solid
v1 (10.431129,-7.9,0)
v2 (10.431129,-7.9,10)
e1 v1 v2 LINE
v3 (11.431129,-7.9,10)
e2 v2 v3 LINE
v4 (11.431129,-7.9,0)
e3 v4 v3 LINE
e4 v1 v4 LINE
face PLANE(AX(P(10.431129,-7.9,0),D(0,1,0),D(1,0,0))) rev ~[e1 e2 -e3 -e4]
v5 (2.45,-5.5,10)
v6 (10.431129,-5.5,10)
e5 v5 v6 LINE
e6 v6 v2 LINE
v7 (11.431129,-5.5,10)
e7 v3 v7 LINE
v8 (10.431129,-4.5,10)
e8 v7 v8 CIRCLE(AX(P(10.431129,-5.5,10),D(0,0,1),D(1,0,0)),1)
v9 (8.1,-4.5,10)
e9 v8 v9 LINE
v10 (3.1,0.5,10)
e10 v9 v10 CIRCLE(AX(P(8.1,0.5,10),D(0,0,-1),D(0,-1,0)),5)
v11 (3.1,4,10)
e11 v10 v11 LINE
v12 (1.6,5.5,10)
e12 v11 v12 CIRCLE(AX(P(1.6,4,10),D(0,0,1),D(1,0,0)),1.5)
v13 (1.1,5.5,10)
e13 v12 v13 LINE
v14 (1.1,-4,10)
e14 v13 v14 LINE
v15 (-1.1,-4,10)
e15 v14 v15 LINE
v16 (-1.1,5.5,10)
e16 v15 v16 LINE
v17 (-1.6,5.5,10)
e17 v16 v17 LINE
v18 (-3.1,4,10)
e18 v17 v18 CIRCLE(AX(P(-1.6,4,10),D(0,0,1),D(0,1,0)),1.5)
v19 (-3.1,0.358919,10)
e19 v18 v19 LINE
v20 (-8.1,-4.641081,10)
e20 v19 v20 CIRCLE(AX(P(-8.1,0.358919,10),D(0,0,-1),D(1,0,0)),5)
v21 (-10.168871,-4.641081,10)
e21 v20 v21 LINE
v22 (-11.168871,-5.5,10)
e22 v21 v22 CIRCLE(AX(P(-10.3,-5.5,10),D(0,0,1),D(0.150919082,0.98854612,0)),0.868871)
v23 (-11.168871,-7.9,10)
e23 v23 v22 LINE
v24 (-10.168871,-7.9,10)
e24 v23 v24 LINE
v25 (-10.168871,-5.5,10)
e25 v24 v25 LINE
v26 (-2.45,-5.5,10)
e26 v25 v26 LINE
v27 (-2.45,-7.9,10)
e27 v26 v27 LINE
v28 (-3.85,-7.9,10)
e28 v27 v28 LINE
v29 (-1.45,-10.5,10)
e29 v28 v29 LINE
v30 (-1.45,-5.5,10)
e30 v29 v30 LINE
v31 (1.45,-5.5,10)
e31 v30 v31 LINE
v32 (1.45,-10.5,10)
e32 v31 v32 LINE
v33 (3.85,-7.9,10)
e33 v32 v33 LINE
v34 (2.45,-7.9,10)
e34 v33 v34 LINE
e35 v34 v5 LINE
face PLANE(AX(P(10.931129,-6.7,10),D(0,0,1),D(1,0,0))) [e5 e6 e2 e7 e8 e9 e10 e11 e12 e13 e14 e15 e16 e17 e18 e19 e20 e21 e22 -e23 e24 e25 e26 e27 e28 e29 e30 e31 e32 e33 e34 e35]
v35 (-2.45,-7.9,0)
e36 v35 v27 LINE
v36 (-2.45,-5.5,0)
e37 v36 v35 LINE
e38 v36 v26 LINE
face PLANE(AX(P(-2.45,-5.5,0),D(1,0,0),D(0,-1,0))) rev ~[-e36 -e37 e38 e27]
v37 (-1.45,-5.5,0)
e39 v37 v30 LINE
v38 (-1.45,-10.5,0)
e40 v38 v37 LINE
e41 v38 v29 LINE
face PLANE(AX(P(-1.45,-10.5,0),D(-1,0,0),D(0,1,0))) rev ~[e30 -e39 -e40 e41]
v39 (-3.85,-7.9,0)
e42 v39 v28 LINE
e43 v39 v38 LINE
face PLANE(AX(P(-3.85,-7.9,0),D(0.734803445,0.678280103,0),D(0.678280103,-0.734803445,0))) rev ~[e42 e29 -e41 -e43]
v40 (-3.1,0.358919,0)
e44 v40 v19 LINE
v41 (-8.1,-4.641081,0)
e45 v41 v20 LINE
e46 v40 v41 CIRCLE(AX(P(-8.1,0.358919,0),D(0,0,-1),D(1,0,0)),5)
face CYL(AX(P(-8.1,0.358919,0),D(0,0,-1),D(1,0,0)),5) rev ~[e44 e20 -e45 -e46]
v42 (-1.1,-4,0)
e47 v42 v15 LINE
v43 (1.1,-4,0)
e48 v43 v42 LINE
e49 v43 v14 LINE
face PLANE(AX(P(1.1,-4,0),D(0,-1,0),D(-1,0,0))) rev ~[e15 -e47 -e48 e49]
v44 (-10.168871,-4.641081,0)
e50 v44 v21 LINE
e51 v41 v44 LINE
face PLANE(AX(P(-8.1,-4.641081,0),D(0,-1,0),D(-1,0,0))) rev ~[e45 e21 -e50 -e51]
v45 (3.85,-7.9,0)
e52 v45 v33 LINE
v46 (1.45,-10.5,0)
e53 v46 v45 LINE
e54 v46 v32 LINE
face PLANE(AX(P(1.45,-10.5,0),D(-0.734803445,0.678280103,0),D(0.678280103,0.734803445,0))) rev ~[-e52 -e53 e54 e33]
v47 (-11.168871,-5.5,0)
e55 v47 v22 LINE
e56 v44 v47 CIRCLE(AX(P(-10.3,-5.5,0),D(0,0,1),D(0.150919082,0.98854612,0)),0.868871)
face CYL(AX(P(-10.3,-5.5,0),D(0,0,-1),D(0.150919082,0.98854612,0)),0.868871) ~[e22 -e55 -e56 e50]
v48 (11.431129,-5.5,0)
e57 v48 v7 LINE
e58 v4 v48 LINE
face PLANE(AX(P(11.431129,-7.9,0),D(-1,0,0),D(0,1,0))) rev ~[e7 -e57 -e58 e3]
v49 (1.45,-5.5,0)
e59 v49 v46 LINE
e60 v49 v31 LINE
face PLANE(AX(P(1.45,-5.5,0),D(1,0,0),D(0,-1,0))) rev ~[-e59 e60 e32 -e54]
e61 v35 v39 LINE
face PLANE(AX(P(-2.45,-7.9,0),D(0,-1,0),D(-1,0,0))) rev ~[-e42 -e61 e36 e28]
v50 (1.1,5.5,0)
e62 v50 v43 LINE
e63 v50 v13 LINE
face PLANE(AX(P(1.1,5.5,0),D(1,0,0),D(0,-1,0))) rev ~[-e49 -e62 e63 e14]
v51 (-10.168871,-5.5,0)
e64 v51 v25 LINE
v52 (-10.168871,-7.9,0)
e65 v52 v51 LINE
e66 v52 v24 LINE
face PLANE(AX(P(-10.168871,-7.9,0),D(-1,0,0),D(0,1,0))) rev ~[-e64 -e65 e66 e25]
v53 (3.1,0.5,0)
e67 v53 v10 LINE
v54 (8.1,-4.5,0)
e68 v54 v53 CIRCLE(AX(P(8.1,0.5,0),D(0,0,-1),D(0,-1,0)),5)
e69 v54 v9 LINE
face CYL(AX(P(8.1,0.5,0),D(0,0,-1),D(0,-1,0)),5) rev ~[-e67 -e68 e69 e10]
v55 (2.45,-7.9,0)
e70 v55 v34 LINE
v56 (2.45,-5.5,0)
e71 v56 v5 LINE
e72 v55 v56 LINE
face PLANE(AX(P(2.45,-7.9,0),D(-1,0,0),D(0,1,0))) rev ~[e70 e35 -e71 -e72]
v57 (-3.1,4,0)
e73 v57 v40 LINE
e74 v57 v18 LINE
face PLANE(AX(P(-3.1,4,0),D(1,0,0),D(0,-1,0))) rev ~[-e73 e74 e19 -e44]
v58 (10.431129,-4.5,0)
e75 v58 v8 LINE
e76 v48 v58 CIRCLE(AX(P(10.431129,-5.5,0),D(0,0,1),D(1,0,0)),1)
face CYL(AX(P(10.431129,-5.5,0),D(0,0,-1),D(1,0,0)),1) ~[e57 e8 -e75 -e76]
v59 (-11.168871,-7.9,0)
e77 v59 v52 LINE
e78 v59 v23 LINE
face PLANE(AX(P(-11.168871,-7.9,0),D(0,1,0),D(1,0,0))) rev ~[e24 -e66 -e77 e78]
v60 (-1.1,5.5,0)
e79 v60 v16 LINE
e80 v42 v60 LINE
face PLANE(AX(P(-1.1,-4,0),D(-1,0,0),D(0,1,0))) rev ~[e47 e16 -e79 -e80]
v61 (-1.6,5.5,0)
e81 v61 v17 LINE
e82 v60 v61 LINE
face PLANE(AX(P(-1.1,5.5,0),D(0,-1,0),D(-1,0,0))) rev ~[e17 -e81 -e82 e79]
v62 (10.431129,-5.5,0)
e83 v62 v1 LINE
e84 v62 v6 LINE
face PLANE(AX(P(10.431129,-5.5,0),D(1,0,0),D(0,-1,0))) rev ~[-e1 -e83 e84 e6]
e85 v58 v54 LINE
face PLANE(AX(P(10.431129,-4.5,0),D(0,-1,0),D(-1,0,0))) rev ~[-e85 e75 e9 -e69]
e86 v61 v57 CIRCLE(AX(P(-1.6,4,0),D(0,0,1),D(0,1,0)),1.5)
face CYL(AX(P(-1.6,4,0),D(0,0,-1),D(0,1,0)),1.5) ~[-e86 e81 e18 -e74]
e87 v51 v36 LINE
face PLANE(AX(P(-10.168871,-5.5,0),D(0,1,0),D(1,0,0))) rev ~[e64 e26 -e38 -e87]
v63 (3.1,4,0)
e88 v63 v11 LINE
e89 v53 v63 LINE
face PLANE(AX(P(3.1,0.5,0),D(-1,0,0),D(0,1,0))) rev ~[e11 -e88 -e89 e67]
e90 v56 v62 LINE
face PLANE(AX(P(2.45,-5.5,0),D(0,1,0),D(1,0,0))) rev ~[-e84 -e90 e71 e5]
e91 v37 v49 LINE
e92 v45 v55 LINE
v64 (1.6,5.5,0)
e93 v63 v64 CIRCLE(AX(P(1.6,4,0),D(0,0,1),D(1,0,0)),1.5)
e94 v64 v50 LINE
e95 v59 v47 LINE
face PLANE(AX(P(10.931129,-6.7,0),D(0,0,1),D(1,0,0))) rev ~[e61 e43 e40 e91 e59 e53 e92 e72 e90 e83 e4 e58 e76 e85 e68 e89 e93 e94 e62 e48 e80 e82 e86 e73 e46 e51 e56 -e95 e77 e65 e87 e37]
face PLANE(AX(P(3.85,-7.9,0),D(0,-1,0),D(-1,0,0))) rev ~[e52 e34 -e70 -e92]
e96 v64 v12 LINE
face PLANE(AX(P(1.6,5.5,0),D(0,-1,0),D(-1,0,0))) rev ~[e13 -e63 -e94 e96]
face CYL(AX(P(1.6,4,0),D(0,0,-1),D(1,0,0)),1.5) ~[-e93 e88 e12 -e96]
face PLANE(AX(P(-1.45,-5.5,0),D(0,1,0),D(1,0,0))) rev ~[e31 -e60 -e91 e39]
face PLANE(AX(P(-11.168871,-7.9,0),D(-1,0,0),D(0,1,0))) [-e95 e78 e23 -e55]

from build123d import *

# Parameters (mm, degrees)
F0_W     = 1
F0_H     = 2.4
F1_DEPTH = 10


# Not quite as in the source:
# - a feature names something its author has since deleted; it is built from what else it names


with BuildPart() as f1:
    # F0 (on Top) → F1 (new body)
    with BuildSketch(Plane.XY):
        with Locations((10.9311291858, -6.7)):
            Rectangle(F0_W, F0_H)
        with Locations((-10.6688708142, -6.7)):
            Rectangle(F0_W, F0_H)
        Polygon((-2.45, -8.5), (-2.45, -7.9), (-3.85, -7.9), (-1.45, -10.5), (-1.45, -8.5), align=None)
        with BuildLine():
            Line((-11.1688708142, -5.5), (-10.1688708142, -5.5))
            Line((-10.1688708142, -5.5), (-10.1688708142, -4.6410811281))
            ThreePointArc((-10.1688708142, -4.6410811281), (-10.8661281522, -4.8408828578), (-11.1688708142, -5.5))
        make_face()
        with BuildLine():
            Line((10.4311291858, -4.5), (10.4311291858, -5.5))
            Line((10.4311291858, -5.5), (11.4311291858, -5.5))
            ThreePointArc((11.4311291858, -5.5), (11.1382359669, -4.7928932188), (10.4311291858, -4.5))
        make_face()
        Polygon((-1.45, -5.5), (-2.45, -5.5), (-2.45, -7.9), (-2.45, -8.5), (-1.45, -8.5), align=None)
        Polygon((2.45, -5.5), (1.45, -5.5), (1.45, -8.5), (2.45, -8.5), (2.45, -7.9), align=None)
        with BuildLine():
            Line((-10.1688708142, -4.6410811281), (-10.1688708142, -5.5))
            Line((-10.1688708142, -5.5), (-2.45, -5.5))
            Line((-2.45, -5.5), (-1.45, -5.5))
            Line((-1.45, -5.5), (1.45, -5.5))
            Line((1.45, -5.5), (2.45, -5.5))
            Line((2.45, -5.5), (10.4311291858, -5.5))
            Line((10.4311291858, -5.5), (10.4311291858, -4.5))
            Line((10.4311291858, -4.5), (8.1, -4.5))
            ThreePointArc((8.1, -4.5), (4.5644660941, -3.0355339059), (3.1, 0.5))
            Line((3.1, 0.5), (3.1, 4))
            ThreePointArc((3.1, 4), (2.6606601718, 5.0606601718), (1.6, 5.5))
            Line((1.6, 5.5), (1.1, 5.5))
            Line((1.1, 5.5), (1.1, -4))
            Line((1.1, -4), (-1.1, -4))
            Line((-1.1, -4), (-1.1, 5.5))
            Line((-1.1, 5.5), (-1.6, 5.5))
            ThreePointArc((-1.6, 5.5), (-2.6606601718, 5.0606601718), (-3.1, 4))
            Line((-3.1, 4), (-3.1, 0.3589188719))
            ThreePointArc((-3.1, 0.3589188719), (-4.5644660941, -3.176615034), (-8.1, -4.6410811281))
            Line((-8.1, -4.6410811281), (-10.1688708142, -4.6410811281))
        make_face()
        Polygon((2.45, -8.5), (1.45, -8.5), (1.45, -10.5), (3.85, -7.9), (2.45, -7.9), align=None)
    extrude(amount=F1_DEPTH)


solid = f1.part
